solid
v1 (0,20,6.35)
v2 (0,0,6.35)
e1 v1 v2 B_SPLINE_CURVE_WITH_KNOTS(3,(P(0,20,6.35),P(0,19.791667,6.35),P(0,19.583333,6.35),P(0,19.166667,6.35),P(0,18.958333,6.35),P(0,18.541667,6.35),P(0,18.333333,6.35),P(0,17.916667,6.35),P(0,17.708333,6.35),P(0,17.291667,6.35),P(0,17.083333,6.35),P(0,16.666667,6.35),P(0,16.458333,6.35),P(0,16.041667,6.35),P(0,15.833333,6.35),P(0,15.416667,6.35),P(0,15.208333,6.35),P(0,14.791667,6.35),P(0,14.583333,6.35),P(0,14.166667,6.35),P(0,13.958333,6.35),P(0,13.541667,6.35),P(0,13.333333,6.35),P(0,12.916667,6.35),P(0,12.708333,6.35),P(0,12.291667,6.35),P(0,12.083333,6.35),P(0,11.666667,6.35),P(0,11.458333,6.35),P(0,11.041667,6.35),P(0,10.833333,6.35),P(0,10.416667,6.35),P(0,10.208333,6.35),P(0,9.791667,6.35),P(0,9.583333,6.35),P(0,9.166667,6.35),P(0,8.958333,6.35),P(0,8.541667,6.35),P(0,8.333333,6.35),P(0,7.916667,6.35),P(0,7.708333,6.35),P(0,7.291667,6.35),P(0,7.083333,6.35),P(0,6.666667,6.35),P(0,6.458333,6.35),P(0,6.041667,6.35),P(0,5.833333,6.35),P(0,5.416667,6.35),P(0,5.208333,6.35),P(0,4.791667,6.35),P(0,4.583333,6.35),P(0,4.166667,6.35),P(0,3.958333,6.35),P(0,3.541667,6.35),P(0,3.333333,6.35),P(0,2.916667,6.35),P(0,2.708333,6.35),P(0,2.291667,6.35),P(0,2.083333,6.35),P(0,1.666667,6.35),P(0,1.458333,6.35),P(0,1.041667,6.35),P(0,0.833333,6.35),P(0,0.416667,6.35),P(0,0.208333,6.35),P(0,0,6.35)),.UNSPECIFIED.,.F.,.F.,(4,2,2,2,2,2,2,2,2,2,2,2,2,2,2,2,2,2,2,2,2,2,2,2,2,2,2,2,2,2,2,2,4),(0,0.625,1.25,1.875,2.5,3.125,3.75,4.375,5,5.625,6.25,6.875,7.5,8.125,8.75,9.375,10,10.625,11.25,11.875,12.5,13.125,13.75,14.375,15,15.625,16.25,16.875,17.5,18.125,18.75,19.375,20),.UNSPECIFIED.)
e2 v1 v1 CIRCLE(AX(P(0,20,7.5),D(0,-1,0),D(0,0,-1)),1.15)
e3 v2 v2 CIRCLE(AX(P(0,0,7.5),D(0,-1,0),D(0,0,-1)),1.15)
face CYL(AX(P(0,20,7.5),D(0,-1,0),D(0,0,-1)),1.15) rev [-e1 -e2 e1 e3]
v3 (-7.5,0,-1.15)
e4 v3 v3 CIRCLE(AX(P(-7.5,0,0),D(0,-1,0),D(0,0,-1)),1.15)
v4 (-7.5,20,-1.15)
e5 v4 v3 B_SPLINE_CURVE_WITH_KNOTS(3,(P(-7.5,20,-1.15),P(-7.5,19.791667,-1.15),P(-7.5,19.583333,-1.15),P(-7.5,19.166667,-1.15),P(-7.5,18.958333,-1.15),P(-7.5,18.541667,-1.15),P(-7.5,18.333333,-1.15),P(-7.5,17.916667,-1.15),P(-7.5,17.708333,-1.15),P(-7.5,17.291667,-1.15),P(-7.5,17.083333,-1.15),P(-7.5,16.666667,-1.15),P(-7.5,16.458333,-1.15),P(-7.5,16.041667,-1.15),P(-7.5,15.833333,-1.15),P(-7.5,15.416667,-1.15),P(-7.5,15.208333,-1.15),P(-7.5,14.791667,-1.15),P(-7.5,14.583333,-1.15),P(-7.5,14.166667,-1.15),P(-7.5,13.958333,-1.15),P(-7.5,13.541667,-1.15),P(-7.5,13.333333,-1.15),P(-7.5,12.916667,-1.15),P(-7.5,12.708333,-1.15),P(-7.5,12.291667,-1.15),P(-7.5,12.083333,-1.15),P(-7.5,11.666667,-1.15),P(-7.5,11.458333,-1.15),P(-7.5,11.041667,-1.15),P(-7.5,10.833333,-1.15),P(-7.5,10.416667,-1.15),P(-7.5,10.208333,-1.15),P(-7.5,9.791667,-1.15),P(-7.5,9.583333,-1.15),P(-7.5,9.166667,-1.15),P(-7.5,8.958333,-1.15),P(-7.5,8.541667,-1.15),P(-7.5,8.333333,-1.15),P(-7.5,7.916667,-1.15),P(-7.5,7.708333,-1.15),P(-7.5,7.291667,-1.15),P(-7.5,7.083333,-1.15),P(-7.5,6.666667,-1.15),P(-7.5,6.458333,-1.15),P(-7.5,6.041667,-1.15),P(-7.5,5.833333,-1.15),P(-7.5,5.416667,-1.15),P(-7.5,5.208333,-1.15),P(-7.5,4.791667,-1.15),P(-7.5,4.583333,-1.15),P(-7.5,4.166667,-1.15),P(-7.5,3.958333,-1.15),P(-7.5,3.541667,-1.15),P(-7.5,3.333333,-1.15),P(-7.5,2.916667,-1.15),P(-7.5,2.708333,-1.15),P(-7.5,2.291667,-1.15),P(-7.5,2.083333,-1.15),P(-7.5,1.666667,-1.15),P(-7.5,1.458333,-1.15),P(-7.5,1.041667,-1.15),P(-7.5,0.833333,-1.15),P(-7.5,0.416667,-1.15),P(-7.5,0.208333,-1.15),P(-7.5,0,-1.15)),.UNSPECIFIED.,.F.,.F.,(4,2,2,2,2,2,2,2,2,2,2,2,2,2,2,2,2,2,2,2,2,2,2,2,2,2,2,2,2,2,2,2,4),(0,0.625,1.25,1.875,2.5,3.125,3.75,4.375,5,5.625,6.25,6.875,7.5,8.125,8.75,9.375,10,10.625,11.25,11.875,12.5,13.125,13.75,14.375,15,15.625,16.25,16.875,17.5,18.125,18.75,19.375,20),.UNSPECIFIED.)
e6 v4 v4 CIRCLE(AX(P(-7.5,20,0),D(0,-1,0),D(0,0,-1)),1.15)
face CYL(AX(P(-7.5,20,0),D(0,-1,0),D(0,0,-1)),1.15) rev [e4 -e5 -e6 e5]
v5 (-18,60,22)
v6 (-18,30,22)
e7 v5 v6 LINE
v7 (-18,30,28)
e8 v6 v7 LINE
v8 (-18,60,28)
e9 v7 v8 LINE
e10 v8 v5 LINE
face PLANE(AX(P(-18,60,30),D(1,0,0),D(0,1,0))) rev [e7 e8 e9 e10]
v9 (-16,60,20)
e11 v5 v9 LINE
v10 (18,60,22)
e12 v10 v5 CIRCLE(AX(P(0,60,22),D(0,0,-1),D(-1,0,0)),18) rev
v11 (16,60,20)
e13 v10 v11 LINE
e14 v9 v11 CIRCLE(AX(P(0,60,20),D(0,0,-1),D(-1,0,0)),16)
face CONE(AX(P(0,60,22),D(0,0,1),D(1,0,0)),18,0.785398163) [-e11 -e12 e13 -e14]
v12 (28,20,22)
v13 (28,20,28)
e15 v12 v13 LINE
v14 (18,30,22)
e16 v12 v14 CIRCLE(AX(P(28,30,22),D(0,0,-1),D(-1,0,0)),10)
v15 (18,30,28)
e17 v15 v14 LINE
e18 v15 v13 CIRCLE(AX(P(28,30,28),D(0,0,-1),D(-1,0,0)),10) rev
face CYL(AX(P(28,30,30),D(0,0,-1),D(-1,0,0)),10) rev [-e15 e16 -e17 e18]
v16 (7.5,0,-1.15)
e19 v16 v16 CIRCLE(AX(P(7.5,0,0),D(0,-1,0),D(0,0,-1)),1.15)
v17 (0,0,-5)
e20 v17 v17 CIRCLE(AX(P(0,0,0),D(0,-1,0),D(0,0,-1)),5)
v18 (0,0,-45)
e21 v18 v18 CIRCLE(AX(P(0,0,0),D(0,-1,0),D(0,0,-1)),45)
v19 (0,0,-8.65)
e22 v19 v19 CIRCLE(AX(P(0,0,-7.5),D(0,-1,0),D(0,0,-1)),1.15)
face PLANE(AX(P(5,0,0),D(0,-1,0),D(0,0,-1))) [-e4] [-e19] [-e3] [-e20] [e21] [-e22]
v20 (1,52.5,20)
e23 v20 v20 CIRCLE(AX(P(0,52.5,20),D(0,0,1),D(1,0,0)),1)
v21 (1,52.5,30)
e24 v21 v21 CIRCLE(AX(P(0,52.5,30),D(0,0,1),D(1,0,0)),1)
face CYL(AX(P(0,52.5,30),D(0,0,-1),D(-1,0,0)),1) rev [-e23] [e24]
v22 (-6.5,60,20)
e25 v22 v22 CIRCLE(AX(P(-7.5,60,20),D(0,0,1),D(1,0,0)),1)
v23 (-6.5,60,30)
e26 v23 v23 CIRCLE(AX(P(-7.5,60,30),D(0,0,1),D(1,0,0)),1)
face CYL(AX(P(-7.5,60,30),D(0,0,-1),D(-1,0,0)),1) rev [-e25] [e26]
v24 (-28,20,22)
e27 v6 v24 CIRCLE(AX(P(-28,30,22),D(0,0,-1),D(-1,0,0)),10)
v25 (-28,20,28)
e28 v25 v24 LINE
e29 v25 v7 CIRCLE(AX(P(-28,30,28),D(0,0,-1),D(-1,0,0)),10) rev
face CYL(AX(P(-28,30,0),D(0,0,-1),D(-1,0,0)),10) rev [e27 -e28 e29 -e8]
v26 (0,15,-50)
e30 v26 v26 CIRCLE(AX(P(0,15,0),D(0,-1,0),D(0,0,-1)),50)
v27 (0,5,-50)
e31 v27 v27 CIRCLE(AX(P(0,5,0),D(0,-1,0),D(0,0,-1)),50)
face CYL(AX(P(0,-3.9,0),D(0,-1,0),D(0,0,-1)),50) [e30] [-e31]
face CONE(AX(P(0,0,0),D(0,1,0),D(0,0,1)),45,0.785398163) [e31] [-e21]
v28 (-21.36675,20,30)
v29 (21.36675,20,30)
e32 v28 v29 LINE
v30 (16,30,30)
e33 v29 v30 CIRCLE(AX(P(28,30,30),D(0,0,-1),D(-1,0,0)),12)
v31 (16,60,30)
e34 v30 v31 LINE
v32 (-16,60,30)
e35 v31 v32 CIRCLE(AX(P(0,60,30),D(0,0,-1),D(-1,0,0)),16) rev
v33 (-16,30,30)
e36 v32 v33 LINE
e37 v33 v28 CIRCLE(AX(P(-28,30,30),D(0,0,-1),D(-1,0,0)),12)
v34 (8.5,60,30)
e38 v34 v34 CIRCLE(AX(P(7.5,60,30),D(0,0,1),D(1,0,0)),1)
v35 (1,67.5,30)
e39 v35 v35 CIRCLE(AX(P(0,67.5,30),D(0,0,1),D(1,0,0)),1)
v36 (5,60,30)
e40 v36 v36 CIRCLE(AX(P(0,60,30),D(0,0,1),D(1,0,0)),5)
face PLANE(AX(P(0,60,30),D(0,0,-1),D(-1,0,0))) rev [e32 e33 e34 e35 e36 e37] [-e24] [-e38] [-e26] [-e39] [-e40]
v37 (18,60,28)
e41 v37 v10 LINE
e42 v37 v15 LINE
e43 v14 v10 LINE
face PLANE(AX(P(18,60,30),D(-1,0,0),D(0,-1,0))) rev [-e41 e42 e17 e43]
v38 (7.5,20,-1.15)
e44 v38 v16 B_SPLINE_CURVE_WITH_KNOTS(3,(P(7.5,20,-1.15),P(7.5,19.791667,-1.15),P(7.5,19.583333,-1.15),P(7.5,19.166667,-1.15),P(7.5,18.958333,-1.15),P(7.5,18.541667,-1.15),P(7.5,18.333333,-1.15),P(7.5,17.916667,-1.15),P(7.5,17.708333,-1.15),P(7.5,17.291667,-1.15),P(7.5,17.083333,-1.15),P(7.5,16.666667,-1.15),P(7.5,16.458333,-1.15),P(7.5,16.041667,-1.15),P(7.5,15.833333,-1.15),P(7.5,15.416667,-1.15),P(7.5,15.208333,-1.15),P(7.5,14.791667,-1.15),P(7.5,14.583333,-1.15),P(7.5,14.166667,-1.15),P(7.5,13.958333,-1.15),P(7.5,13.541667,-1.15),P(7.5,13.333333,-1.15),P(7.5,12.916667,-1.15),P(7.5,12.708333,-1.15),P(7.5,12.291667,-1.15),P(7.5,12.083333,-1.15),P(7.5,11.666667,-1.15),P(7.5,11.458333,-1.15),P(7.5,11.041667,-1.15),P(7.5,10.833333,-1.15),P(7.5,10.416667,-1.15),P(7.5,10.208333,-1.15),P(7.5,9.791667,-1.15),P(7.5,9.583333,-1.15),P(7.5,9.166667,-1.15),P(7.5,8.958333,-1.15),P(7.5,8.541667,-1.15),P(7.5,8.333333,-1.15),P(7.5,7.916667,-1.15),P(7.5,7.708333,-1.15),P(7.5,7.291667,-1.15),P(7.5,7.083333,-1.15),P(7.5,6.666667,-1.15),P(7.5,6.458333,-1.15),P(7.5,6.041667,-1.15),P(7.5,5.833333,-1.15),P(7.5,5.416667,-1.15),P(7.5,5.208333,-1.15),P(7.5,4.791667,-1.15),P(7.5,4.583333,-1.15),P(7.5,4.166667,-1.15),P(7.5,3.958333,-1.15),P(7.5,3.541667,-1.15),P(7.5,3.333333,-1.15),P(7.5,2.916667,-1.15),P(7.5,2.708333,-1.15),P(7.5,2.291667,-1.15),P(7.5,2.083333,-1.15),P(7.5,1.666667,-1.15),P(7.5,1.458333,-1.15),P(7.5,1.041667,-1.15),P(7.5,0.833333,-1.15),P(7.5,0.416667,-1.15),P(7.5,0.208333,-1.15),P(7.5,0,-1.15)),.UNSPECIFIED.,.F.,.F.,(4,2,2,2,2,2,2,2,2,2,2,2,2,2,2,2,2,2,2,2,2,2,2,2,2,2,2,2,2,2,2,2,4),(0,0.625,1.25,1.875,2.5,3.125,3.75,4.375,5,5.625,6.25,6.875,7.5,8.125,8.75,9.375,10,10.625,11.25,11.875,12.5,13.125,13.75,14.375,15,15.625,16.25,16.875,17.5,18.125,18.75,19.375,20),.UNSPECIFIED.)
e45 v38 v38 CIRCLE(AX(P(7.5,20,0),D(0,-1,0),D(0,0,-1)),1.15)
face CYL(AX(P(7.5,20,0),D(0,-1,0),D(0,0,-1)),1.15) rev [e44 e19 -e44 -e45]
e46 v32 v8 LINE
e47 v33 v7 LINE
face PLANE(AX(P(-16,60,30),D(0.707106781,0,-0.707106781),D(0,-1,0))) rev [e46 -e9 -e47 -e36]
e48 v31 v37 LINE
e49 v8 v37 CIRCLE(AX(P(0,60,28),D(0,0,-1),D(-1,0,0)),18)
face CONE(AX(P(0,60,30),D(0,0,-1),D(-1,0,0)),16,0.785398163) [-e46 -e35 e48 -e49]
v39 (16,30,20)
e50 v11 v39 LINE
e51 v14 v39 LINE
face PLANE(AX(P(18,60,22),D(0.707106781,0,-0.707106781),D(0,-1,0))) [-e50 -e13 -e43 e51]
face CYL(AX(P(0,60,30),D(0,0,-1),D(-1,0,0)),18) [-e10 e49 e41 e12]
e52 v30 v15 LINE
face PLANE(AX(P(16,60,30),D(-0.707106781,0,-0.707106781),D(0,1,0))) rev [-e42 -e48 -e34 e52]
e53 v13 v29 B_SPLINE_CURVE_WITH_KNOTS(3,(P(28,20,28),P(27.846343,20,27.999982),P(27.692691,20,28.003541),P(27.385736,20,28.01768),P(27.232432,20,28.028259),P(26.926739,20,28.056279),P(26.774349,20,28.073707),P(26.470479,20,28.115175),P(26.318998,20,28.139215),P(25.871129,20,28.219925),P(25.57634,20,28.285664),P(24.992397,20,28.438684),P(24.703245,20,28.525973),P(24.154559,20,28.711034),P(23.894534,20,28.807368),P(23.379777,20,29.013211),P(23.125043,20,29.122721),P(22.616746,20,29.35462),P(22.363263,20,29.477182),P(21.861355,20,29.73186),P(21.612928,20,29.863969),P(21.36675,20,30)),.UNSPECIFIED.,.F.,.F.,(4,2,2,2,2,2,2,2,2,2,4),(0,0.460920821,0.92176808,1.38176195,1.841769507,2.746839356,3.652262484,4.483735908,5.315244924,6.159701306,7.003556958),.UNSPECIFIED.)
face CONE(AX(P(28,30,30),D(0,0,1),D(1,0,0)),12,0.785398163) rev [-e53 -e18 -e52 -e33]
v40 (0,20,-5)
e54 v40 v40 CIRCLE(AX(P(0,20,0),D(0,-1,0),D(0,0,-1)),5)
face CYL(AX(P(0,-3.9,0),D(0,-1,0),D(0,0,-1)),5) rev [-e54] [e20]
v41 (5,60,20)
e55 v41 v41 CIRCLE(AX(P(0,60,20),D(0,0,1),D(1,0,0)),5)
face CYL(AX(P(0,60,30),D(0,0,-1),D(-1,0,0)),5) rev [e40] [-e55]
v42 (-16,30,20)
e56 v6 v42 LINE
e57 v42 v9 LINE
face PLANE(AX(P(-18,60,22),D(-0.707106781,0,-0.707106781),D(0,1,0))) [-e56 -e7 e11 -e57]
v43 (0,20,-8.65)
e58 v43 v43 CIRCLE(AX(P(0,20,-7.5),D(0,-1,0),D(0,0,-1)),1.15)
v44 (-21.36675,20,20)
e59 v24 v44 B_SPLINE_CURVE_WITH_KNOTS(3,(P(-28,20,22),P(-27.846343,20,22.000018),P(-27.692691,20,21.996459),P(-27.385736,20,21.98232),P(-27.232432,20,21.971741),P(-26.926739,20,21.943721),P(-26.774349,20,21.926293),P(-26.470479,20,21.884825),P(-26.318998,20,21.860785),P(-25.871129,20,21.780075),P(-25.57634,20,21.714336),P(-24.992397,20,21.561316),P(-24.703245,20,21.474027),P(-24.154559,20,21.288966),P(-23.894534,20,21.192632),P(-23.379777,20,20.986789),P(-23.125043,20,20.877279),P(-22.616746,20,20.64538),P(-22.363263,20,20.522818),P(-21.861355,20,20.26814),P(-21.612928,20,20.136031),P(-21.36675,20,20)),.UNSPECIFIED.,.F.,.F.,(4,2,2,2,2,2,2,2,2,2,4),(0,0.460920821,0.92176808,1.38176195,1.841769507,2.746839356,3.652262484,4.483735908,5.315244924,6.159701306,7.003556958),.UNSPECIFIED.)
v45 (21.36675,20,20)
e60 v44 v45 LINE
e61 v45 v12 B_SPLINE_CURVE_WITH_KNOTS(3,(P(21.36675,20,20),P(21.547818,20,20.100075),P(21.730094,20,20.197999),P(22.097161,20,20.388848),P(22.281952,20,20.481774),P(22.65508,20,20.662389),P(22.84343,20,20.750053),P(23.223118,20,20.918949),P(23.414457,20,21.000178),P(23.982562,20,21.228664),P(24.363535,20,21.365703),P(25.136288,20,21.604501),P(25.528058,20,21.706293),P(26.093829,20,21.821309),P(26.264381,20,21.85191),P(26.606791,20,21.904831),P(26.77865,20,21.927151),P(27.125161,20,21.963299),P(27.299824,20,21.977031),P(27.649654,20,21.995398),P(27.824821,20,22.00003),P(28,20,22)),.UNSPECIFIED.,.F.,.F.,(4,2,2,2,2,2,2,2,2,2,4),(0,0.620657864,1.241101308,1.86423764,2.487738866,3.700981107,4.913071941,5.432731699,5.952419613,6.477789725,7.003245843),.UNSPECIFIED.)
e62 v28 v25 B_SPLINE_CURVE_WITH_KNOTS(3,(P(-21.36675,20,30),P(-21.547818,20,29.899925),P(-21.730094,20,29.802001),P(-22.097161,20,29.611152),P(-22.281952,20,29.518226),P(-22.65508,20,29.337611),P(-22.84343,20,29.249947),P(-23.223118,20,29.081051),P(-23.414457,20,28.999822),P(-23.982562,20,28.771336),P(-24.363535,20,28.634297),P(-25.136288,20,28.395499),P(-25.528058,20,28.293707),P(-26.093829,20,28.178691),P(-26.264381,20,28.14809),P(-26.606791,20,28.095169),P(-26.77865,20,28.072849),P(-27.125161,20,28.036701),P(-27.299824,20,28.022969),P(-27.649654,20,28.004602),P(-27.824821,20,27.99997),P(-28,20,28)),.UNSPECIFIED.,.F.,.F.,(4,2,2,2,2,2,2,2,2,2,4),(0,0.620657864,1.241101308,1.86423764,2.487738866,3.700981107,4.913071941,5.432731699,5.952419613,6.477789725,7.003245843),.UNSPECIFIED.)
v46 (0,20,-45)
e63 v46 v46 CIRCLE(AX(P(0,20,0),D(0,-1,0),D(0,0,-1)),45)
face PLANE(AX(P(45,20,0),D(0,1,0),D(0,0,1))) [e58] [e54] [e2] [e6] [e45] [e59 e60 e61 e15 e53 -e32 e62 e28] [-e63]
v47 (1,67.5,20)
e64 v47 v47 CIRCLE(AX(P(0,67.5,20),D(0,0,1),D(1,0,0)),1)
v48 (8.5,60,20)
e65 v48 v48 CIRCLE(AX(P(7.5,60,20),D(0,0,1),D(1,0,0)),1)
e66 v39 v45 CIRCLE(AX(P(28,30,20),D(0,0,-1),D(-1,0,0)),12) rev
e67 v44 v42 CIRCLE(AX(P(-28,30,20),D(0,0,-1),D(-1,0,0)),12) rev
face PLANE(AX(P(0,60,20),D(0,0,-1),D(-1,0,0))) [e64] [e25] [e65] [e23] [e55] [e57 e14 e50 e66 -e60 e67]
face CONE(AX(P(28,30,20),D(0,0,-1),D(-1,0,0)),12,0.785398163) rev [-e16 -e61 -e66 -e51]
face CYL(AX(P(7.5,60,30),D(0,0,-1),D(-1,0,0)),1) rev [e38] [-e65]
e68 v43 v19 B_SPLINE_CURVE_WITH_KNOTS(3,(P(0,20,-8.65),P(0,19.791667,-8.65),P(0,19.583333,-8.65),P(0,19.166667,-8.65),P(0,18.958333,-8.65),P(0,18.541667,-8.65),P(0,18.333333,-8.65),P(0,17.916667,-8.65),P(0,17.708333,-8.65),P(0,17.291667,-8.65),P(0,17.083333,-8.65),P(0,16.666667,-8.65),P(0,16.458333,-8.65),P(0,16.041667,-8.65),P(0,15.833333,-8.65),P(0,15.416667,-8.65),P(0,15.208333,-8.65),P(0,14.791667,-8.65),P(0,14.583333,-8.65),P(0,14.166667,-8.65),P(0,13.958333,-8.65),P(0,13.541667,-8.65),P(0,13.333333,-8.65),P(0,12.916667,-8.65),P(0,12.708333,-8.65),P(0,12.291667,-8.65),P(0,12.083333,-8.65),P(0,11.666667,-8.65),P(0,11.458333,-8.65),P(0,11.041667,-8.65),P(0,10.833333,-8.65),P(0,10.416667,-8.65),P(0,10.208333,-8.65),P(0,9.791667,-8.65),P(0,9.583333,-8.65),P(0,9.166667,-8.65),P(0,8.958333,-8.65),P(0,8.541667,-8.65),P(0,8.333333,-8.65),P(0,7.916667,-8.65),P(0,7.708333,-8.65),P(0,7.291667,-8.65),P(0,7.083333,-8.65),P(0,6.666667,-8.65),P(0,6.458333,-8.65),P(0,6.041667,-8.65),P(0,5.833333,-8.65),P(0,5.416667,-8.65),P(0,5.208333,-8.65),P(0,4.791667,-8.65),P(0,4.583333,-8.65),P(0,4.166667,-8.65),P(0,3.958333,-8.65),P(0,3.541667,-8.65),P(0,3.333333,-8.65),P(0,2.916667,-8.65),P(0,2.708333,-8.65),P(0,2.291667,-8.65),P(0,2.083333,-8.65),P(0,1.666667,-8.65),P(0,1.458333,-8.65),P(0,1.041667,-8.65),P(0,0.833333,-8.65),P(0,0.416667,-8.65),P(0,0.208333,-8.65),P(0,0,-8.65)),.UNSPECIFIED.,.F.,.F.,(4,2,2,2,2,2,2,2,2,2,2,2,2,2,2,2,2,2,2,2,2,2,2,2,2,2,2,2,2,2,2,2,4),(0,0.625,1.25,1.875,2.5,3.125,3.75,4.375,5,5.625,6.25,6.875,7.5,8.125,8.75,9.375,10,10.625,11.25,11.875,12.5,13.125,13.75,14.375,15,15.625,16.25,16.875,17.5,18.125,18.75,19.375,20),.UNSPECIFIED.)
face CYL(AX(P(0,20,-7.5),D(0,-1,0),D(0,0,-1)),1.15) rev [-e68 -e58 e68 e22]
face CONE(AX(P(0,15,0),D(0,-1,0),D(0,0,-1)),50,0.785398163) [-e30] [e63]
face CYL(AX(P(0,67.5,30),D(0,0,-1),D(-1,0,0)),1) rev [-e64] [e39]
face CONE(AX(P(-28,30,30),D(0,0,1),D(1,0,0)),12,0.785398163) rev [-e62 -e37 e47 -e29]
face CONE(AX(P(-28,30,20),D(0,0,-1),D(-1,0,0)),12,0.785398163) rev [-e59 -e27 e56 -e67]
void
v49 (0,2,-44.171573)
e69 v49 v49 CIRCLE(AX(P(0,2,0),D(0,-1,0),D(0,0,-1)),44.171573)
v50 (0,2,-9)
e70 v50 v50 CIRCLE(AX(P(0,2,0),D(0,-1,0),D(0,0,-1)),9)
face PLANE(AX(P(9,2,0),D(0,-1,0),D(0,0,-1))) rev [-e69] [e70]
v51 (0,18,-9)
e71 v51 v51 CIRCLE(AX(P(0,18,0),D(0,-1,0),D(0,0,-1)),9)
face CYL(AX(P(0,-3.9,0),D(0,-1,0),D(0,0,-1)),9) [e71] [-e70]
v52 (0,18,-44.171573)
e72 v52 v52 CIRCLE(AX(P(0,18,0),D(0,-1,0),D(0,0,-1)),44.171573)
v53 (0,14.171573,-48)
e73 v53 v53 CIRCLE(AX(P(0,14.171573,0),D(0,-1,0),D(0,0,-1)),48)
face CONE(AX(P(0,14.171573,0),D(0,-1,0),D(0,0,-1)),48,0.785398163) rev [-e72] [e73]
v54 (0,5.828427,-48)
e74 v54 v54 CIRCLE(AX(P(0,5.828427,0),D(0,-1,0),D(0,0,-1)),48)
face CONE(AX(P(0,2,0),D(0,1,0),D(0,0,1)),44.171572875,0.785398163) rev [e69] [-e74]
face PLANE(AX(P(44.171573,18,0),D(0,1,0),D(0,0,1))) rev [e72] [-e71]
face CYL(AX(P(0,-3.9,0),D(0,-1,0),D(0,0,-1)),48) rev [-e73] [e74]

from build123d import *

# Parameters (mm, degrees)
SKETCH2_R           = 1.15
SKETCH2_R_2         = 5
CUT_EXTRUDE1_DEPTH  = 74.484692283
BOSS_EXTRUDE1_START = 20
SKETCH6_R           = 5
SKETCH6_R_2         = 1
BOSS_EXTRUDE1_DEPTH = 10
FILLET1_R           = 10
CHAMFER1_SIZE       = 2


with BuildPart() as part:
    # Sketch1 → Revolve1 (revolve)
    with BuildSketch(Plane.XY, mode=Mode.PRIVATE) as revolve1_sk:
        Polygon((45, 0), (50, 5), (50, 15), (45, 20), (5, 20), (5, 0), align=None)
        Polygon((9, 2), (44.171572875, 2), (48, 5.828427125), (48, 14.171572875), (44.171572875, 18), (9, 18), align=None, mode=Mode.SUBTRACT)
    revolve(revolve1_sk.sketch.rotate(Axis((0, -3.9, 0), (0, 1, 0)), 90), axis=Axis((0, -3.9, 0), (0, 1, 0)))

    # Sketch2 → Cut-Extrude1 (cut, through all)
    with BuildSketch(Plane.XZ):
        with Locations(Location((7.5, 0, 0), (0, 0, 270))):
            Circle(SKETCH2_R)
        with Locations(Location((0, 7.5, 0), (0, 0, 270))):
            Circle(SKETCH2_R)
        with Locations(Location((-7.5, 0, 0), (0, 0, 270))):
            Circle(SKETCH2_R)
        with Locations(Location((0, -7.5, 0), (0, 0, 270))):
            Circle(SKETCH2_R)
        with Locations(Location((0, 0, 0), (0, 0, 270))):
            Circle(SKETCH2_R_2)
    extrude(amount=-CUT_EXTRUDE1_DEPTH, mode=Mode.SUBTRACT)

    # Sketch6 → Boss-Extrude1 (add)
    with BuildSketch(Plane.XY.offset(BOSS_EXTRUDE1_START)):
        with BuildLine():
            Line((18, 60), (18, 20))
            Line((18, 20), (-18, 20))
            Line((-18, 20), (-18, 60))
            ThreePointArc((-18, 60), (0, 78), (18, 60))
        make_face()
        with Locations((0, 60)):
            Circle(SKETCH6_R, mode=Mode.SUBTRACT)
        with Locations((0, 52.5)):
            Circle(SKETCH6_R_2, mode=Mode.SUBTRACT)
        with Locations((7.5, 60)):
            Circle(SKETCH6_R_2, mode=Mode.SUBTRACT)
        with Locations((0, 67.5)):
            Circle(SKETCH6_R_2, mode=Mode.SUBTRACT)
        with Locations((-7.5, 60)):
            Circle(SKETCH6_R_2, mode=Mode.SUBTRACT)
    extrude(amount=BOSS_EXTRUDE1_DEPTH)

    # Fillet1
    fillet1_edges = [part.edges().sort_by_distance(p)[0] for p in [
        (-18, 20, 25),
        (18, 20, 25),
    ]]
    fillet(fillet1_edges, radius=FILLET1_R)

    # Chamfer1
    # the kernel refuses this chamfer: 2 mm, written as the material it takes off along each edge
    with BuildSketch(Plane(origin=(0, 60, 30), x_dir=(-1, 0, 0), z_dir=(0, -1, 0))) as chamfer1_piece_1:
        Polygon((18, CHAMFER1_SIZE), (18 - CHAMFER1_SIZE, 0), (18, 0), align=None)
    revolve(axis=Axis((0, 60, 30), (0, 0, -1)), revolution_arc=180, mode=Mode.SUBTRACT)
    with BuildSketch(Plane(origin=(-18, 30, 30), x_dir=(-0.027495876610585647, 0, -0.9996219169112968), z_dir=(0, 1, 0)), Plane(origin=(18, 60, 30), x_dir=(0.027495876610585647, 0, -0.9996219169112968), z_dir=(0, -1, 0))) as chamfer1_piece_2:
        Polygon((CHAMFER1_SIZE * 0.999621916911, -CHAMFER1_SIZE * 0.0274958766106), (-CHAMFER1_SIZE * 0.0274958766106, -CHAMFER1_SIZE * 0.999621916911), (0, 0), align=None)
    extrude(amount=30, mode=Mode.SUBTRACT)
    with BuildSketch(Plane(origin=(0, 60, 20), x_dir=(-1, 0, 0), z_dir=(0, -1, 0))) as chamfer1_piece_3:
        Polygon((18, -CHAMFER1_SIZE), (18 - CHAMFER1_SIZE, 0), (18, 0), align=None)
    revolve(axis=Axis((0, 60, 20), (0, 0, -1)), revolution_arc=180, mode=Mode.SUBTRACT)
    with BuildSketch(Plane(origin=(-18, 30, 20), x_dir=(-0.027495876610585647, 0, 0.9996219169112968), z_dir=(0, 1, 0)), Plane(origin=(18, 60, 20), x_dir=(0.027495876610585647, 0, 0.9996219169112968), z_dir=(0, -1, 0))) as chamfer1_piece_4:
        Polygon((CHAMFER1_SIZE * 0.999621916911, CHAMFER1_SIZE * 0.0274958766106), (-CHAMFER1_SIZE * 0.0274958766106, CHAMFER1_SIZE * 0.999621916911), (0, 0), align=None)
    extrude(amount=30, mode=Mode.SUBTRACT)
    with BuildSketch(Plane(origin=(-28, 30, 20), x_dir=(-0.49213725734726604, -0.8705176160944192, 0), z_dir=(-0.8705176160944192, 0.49213725734726604, 0))) as chamfer1_piece_5_section:
        Polygon((10, CHAMFER1_SIZE), (10 + CHAMFER1_SIZE, 0), (10, 0), align=None)
    chamfer1_piece_5 = revolve(axis=Axis((-28, 30, 20), (0, 0, 1)), revolution_arc=119.481154356, mode=Mode.PRIVATE)
    chamfer1_piece_5 = split(chamfer1_piece_5, bisect_by=Plane(origin=(-20.846294556, 20, 20.72247208), z_dir=(0, 1, 0)), keep=Keep.TOP, mode=Mode.PRIVATE)
    add(chamfer1_piece_5, mode=Mode.SUBTRACT)
    with BuildSketch(Plane(origin=(-28, 30, 30), x_dir=(-0.49213725734726604, -0.8705176160944192, 0), z_dir=(-0.8705176160944192, 0.49213725734726604, 0))) as chamfer1_piece_6_section:
        Polygon((10, -CHAMFER1_SIZE), (10 + CHAMFER1_SIZE, 0), (10, 0), align=None)
    chamfer1_piece_6 = revolve(axis=Axis((-28, 30, 30), (0, 0, 1)), revolution_arc=119.481154356, mode=Mode.PRIVATE)
    chamfer1_piece_6 = split(chamfer1_piece_6, bisect_by=Plane(origin=(-20.846294556, 20, 29.27752792), z_dir=(0, 1, 0)), keep=Keep.TOP, mode=Mode.PRIVATE)
    add(chamfer1_piece_6, mode=Mode.SUBTRACT)
    with BuildSketch(Plane(origin=(28, 30, 20), x_dir=(0.49213725734726604, -0.8705176160944192, 0), z_dir=(0.8705176160944192, 0.49213725734726604, 0))) as chamfer1_piece_7_section:
        Polygon((10, -CHAMFER1_SIZE), (10 + CHAMFER1_SIZE, 0), (10, 0), align=None)
    chamfer1_piece_7 = revolve(axis=Axis((28, 30, 20), (0, 0, -1)), revolution_arc=119.481154356, mode=Mode.PRIVATE)
    chamfer1_piece_7 = split(chamfer1_piece_7, bisect_by=Plane(origin=(20.846294556, 20, 20.72247208), z_dir=(0, 1, 0)), keep=Keep.TOP, mode=Mode.PRIVATE)
    add(chamfer1_piece_7, mode=Mode.SUBTRACT)
    with BuildSketch(Plane(origin=(28, 30, 30), x_dir=(0.49213725734726604, -0.8705176160944192, 0), z_dir=(0.8705176160944192, 0.49213725734726604, 0))) as chamfer1_piece_8_section:
        Polygon((10 + CHAMFER1_SIZE, 0), (10, CHAMFER1_SIZE), (10, 0), align=None)
    chamfer1_piece_8 = revolve(axis=Axis((28, 30, 30), (0, 0, -1)), revolution_arc=119.481154356, mode=Mode.PRIVATE)
    chamfer1_piece_8 = split(chamfer1_piece_8, bisect_by=Plane(origin=(20.846294556, 20, 29.27752792), z_dir=(0, 1, 0)), keep=Keep.TOP, mode=Mode.PRIVATE)
    add(chamfer1_piece_8, mode=Mode.SUBTRACT)


solid = part.part
